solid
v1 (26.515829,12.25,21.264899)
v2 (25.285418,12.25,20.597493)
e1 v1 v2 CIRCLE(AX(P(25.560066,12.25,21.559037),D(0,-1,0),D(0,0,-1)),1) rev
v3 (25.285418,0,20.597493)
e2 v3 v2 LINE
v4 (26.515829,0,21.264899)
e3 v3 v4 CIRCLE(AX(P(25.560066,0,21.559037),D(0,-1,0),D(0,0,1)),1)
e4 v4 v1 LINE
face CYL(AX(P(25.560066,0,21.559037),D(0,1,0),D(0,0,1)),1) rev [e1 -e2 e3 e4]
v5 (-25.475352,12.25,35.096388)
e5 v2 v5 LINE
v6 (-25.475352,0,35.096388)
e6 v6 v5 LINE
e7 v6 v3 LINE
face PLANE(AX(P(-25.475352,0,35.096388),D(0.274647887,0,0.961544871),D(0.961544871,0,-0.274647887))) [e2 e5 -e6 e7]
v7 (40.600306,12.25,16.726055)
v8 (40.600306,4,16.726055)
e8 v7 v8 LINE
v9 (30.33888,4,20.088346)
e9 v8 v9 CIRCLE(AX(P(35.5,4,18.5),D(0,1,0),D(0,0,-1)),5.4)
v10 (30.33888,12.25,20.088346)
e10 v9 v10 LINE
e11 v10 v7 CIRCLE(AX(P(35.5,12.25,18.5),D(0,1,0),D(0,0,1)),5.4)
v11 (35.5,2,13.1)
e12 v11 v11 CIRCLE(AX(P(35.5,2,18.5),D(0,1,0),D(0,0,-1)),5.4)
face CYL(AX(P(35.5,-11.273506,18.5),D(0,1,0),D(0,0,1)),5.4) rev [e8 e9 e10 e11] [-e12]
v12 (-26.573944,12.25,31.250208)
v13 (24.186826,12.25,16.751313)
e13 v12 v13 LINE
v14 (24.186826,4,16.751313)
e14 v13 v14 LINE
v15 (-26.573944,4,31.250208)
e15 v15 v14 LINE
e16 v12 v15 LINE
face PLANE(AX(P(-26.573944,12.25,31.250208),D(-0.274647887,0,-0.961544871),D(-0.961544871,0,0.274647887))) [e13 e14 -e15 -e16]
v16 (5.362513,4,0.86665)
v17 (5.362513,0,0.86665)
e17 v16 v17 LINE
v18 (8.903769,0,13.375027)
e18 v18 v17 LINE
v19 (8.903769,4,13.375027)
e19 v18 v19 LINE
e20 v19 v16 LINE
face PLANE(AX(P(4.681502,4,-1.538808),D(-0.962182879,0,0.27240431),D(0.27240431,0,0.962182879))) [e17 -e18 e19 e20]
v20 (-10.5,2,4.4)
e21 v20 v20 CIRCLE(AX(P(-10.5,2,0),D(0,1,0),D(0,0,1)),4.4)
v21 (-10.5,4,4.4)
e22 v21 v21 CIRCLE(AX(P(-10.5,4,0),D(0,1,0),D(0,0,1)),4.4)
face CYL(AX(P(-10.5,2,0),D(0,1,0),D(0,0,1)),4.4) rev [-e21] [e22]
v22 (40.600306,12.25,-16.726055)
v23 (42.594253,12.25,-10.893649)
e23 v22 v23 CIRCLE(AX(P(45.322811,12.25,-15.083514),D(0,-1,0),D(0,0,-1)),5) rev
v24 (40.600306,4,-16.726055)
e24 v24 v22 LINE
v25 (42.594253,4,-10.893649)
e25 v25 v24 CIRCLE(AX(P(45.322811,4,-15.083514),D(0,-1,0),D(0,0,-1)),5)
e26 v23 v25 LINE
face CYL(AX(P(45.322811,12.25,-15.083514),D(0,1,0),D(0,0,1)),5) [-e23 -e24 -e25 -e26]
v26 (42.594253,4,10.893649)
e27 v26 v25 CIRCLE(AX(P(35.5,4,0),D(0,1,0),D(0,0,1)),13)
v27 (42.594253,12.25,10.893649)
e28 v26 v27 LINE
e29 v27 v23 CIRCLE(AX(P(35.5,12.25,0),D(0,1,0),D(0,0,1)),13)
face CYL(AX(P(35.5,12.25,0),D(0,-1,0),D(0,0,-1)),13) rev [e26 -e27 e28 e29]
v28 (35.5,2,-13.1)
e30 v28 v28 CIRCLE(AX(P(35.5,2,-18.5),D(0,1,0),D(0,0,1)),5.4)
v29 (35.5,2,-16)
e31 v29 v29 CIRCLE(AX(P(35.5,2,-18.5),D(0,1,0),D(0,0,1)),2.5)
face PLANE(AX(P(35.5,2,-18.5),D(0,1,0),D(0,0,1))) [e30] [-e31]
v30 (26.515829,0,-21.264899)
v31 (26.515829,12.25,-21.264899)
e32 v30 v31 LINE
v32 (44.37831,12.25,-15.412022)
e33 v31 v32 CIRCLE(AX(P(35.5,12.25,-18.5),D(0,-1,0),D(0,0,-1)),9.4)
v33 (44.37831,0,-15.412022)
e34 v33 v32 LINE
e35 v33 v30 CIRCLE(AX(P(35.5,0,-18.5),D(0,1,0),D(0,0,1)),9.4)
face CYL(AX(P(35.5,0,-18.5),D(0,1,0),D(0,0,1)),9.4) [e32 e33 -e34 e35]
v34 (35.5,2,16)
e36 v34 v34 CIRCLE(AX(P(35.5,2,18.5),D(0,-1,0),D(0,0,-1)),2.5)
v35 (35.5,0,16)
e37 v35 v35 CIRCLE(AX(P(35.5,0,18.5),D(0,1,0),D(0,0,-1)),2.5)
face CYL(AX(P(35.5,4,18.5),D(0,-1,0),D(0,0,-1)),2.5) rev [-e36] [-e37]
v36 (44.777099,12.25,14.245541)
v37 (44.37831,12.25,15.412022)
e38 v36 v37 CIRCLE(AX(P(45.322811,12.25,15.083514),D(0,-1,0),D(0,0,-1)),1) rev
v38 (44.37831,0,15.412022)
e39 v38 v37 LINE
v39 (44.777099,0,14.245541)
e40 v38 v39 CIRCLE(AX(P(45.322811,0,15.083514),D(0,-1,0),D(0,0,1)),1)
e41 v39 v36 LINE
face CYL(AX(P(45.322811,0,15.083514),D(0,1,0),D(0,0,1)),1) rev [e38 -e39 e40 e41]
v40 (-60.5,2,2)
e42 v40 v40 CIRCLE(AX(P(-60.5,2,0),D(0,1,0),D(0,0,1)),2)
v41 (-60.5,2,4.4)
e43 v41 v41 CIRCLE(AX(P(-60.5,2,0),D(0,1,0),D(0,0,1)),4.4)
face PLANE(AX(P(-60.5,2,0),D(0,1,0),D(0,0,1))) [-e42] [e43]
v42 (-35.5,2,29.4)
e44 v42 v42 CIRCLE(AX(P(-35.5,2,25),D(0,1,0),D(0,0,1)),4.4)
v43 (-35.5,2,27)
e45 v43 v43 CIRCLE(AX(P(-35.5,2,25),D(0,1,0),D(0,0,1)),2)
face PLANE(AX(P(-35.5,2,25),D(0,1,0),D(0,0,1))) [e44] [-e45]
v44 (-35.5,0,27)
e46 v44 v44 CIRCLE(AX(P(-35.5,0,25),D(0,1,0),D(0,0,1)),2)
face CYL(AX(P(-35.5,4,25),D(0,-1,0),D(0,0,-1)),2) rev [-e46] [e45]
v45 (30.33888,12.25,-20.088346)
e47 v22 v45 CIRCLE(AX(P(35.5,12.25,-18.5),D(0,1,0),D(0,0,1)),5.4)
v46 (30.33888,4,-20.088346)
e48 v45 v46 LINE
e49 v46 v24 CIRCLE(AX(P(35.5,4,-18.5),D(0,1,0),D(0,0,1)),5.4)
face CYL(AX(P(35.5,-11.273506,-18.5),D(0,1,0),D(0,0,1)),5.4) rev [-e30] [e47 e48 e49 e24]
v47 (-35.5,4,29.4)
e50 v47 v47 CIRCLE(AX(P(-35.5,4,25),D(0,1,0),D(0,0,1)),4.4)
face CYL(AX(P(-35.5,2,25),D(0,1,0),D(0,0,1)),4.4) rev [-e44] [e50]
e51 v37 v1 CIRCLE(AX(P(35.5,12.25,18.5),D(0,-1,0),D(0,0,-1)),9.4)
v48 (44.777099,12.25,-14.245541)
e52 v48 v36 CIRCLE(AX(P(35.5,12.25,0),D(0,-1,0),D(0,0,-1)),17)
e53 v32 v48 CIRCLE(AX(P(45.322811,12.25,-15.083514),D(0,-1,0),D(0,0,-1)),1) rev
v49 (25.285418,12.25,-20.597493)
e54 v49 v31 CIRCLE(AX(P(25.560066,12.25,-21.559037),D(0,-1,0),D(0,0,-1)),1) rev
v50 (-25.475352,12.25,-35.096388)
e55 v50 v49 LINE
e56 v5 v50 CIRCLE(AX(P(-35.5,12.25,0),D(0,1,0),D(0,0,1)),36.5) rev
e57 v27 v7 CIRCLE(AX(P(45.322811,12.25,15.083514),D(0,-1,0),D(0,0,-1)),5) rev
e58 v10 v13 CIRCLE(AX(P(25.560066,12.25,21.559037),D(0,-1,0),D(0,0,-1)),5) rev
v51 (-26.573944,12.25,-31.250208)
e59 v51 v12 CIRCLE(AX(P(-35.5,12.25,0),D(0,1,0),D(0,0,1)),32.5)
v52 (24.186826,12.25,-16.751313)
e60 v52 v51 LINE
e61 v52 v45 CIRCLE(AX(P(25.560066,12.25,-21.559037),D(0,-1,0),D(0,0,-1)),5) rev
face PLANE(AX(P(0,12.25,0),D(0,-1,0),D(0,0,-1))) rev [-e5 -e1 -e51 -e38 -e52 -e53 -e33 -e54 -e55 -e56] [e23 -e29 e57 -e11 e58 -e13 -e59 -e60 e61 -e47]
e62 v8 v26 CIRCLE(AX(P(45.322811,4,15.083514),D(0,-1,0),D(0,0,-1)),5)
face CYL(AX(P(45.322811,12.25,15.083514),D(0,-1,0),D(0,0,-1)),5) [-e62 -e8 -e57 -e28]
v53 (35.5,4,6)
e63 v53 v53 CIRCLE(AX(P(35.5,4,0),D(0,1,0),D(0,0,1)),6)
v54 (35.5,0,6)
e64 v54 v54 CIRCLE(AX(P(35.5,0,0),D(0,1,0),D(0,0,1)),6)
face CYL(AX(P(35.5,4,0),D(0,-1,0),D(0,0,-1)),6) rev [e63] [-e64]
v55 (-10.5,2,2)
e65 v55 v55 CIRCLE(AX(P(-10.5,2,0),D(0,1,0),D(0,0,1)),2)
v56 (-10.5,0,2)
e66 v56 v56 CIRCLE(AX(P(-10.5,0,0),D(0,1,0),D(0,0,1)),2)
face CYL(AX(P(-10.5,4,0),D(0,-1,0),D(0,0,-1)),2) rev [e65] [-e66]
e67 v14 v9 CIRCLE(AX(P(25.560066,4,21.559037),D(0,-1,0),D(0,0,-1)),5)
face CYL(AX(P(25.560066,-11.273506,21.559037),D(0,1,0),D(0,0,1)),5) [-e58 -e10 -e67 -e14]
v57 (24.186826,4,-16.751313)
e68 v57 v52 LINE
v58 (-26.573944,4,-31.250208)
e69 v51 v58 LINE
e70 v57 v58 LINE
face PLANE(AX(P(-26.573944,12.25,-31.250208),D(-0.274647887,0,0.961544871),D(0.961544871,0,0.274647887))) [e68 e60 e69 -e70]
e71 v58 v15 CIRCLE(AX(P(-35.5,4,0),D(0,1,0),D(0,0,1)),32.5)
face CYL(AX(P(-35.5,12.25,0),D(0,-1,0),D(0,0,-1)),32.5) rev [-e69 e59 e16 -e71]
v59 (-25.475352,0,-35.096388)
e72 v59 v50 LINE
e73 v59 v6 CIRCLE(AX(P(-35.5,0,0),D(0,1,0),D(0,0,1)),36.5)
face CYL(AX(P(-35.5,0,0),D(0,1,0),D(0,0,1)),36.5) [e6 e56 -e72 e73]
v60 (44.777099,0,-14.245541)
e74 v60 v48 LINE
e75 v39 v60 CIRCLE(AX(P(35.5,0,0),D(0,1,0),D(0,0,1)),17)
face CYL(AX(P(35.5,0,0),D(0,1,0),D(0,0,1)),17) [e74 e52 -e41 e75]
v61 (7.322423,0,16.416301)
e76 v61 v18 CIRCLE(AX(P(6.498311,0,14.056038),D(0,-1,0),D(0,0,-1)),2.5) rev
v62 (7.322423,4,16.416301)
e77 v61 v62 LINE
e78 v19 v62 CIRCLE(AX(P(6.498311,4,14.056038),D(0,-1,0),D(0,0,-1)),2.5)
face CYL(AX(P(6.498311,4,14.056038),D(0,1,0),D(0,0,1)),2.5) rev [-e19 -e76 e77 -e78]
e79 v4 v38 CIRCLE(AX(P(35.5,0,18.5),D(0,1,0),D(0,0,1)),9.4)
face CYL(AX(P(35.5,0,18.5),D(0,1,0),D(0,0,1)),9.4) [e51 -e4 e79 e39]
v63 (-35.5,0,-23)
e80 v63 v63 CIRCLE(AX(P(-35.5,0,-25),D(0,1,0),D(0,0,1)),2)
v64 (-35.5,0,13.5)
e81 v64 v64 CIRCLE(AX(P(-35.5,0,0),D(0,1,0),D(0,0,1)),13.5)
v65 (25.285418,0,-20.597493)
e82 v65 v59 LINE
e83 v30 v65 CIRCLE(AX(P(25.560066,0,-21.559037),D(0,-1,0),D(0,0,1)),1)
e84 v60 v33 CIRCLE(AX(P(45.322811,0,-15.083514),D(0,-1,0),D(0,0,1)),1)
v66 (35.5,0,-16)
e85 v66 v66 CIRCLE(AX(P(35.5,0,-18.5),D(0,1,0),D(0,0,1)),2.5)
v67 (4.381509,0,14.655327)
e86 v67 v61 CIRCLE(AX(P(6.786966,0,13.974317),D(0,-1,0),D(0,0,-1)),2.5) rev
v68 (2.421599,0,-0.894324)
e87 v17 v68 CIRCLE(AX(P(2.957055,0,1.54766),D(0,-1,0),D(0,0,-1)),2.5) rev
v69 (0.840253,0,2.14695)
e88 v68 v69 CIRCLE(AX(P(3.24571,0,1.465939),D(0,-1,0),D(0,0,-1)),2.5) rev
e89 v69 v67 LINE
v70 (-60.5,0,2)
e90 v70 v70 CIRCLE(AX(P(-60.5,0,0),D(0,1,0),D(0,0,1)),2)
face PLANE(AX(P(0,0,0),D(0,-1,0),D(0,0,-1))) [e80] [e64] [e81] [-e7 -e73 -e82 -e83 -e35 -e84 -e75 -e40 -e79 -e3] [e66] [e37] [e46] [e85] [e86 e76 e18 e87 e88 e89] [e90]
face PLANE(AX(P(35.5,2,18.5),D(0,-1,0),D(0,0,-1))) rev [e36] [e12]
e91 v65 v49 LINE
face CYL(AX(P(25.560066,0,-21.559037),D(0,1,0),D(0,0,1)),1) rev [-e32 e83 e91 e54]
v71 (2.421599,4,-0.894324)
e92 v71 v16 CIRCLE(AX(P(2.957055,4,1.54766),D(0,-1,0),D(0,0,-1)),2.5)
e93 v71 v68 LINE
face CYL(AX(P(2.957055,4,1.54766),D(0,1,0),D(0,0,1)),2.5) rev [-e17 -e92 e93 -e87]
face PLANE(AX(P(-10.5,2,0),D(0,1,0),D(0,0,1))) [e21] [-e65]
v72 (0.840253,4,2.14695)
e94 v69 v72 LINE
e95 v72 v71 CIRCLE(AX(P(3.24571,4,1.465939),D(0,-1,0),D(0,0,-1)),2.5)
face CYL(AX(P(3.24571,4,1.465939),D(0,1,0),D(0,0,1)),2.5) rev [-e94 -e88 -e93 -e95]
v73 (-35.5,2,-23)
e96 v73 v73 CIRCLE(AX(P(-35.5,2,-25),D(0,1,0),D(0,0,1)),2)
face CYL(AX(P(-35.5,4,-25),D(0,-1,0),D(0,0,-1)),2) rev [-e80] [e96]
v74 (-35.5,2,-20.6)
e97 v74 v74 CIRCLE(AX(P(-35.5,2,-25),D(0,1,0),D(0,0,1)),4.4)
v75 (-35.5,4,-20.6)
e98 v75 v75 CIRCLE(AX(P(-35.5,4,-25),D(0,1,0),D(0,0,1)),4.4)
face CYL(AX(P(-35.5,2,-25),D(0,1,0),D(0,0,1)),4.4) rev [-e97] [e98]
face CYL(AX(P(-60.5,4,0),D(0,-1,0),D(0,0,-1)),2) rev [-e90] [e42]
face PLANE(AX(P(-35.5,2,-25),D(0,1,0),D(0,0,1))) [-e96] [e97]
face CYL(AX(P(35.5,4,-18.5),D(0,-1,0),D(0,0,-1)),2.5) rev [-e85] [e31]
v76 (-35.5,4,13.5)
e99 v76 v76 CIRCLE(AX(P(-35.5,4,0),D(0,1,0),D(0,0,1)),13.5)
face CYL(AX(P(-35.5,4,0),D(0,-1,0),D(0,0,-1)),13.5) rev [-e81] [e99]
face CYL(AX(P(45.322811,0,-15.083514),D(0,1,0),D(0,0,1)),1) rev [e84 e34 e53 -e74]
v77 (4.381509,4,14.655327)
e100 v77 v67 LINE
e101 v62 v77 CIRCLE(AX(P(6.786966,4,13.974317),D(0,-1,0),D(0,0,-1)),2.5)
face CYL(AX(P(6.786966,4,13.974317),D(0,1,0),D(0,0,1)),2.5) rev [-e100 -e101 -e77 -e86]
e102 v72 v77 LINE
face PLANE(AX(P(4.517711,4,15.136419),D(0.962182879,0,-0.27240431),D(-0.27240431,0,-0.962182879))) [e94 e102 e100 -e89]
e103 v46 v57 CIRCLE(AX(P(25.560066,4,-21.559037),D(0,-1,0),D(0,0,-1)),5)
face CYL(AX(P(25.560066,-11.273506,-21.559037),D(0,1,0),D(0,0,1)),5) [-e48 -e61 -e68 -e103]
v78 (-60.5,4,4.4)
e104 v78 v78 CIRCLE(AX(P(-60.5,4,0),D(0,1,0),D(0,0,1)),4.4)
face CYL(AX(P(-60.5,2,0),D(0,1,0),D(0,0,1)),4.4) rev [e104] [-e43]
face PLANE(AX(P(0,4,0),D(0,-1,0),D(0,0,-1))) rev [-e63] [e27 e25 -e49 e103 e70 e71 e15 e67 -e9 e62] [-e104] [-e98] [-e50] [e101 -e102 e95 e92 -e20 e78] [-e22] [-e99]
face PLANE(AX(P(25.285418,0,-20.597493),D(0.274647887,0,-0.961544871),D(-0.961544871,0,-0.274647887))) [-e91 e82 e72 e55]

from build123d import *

# Parameters (mm, degrees)
SKETCH1_W               = 175
SKETCH1_H               = 100
SKETCH1_R               = 6
SKETCH1_R_2             = 13.5
SKETCH1_R_3             = 2
SKETCH1_R_4             = 2.5
BOSS_EXTRUDE1_DEPTH     = 4
SKETCH3_W               = 175
SKETCH3_H               = 100
BOSS_EXTRUDE2_DEPTH     = 8.25
SKETCH6_R               = 5.4
CUT_EXTRUDE2_DEPTH      = 8.25
FILLET1_R               = 2.5
FILLET2_R               = 5
SKETCH2_R               = 4.4
SKETCH2_R_2             = 5.4
CUT_EXTRUDE1_DEPTH      = 2
CUT_EXTRUDE4_DEPTH      = 102.520010478
CUT_EXTRUDE4_DEPTH_BACK = 102.520010478
SKETCH7_OUTSIDE_W       = 217.386
SKETCH7_OUTSIDE_H       = 142.386


with BuildPart() as part:
    # Sketch1 → Boss-Extrude1 (new body)
    with BuildSketch(Plane(origin=(0, 0, 0), x_dir=(1, 0, 0), z_dir=(0, 1, 0))):
        Rectangle(SKETCH1_W, SKETCH1_H)
        with Locations(Location((35.5, 0, 0), (0, 0, 270))):
            Circle(SKETCH1_R, mode=Mode.SUBTRACT)
        with Locations(Location((-35.5, 0, 0), (0, 0, 270))):
            Circle(SKETCH1_R_2, mode=Mode.SUBTRACT)
        with Locations(Location((-60.5, 0, 0), (0, 0, 270))):
            Circle(SKETCH1_R_3, mode=Mode.SUBTRACT)
        with Locations(Location((-35.5, 25, 0), (0, 0, 270))):
            Circle(SKETCH1_R_3, mode=Mode.SUBTRACT)
        with Locations(Location((-10.5, 0, 0), (0, 0, 270))):
            Circle(SKETCH1_R_3, mode=Mode.SUBTRACT)
        with Locations(Location((-35.5, -25, 0), (0, 0, 270))):
            Circle(SKETCH1_R_3, mode=Mode.SUBTRACT)
        with Locations(Location((35.5, 18.5, 0), (0, 0, 270))):
            Circle(SKETCH1_R_4, mode=Mode.SUBTRACT)
        with Locations(Location((35.5, -18.5, 0), (0, 0, 90))):
            Circle(SKETCH1_R_4, mode=Mode.SUBTRACT)
        Polygon((4.517711304, -15.136418767), (0.159242352, 0.258507293), (4.681501882, 1.538807548), (9.039970835, -13.856118512), (9.584779454, -15.78048427), (5.062519924, -17.060784524), align=None, mode=Mode.SUBTRACT)
    extrude(amount=BOSS_EXTRUDE1_DEPTH)

    # Sketch3 → Boss-Extrude2 (add)
    with BuildSketch(Plane(origin=(0, 4, 0), x_dir=(1, 0, 0), z_dir=(0, 1, 0))):
        Rectangle(SKETCH3_W, SKETCH3_H)
        with BuildLine():
            Line((-26.573943662, 31.250208291), (39.070422535, 12.500083317))
            ThreePointArc((39.070422535, 12.500083317), (48.5, 0), (39.070422535, -12.500083317))
            Line((39.070422535, -12.500083317), (-26.573943662, -31.250208291))
            ThreePointArc((-26.573943662, -31.250208291), (-68, 0), (-26.573943662, 31.250208291))
        make_face(mode=Mode.SUBTRACT)
    extrude(amount=BOSS_EXTRUDE2_DEPTH)

    # Sketch6 → Cut-Extrude2 (cut)
    with BuildSketch(Plane(origin=(0, 12.25, 0), x_dir=(1, 0, 0), z_dir=(0, 1, 0))):
        with Locations((35.5, 18.5)):
            Circle(SKETCH6_R)
        with Locations((35.5, -18.5)):
            Circle(SKETCH6_R)
    extrude(amount=-CUT_EXTRUDE2_DEPTH, mode=Mode.SUBTRACT)

    # Fillet1
    # the kernel refuses this fillet: 2.5 mm, written as the material it adds along each edge
    with BuildSketch(Plane(origin=(9.584779454, 0, 15.78048427), x_dir=(-0.9621828787440704, 0, 0.2724043095323078), z_dir=(0, 1, 0)), Plane(origin=(5.062519924, 0, 17.060784524), x_dir=(-0.2724043095323173, 0, -0.9621828787440677), z_dir=(0, 1, 0)), Plane(origin=(4.681501882, 0, -1.538807548), x_dir=(0.2724043095323092, 0, 0.96218287874407), z_dir=(0, 1, 0))) as fillet1_piece_1:
        with BuildLine():
            CenterArc((FILLET1_R, -FILLET1_R), FILLET1_R, 90, 90)
            Line((0, -FILLET1_R), (0, 0))
            Line((0, 0), (FILLET1_R, 0))
        make_face()
    extrude(amount=4)
    with BuildSketch(Plane(origin=(0.159242352, 0, -0.258507293), x_dir=(0.2724043095323079, 0, 0.9621828787440704), z_dir=(0, 1, 0))) as fillet1_piece_2:
        with BuildLine():
            CenterArc((FILLET1_R, FILLET1_R), FILLET1_R, 180, 90)
            Line((0, FILLET1_R), (0, 0))
            Line((0, 0), (FILLET1_R, 0))
        make_face()
    extrude(amount=4)

    # Fillet2
    fillet2_edges = [part.edges().sort_by_distance(p)[0] for p in [
        (31.784909874, 8.125, 14.581058133),
        (36.584743308, 8.125, 13.210072594),
        (36.584743308, 8.125, -13.210072594),
        (31.784909874, 8.125, -14.581058133),
    ]]
    fillet(fillet2_edges, radius=FILLET2_R)

    # Sketch2 → Cut-Extrude1 (cut)
    with BuildSketch(Plane(origin=(0, 4, 0), x_dir=(1, 0, 0), z_dir=(0, 1, 0))):
        with Locations(Location((-35.5, 25, 0), (0, 0, 270))):
            Circle(SKETCH2_R)
        with Locations(Location((-10.5, 0, 0), (0, 0, 270))):
            Circle(SKETCH2_R)
        with Locations(Location((-35.5, -25, 0), (0, 0, 270))):
            Circle(SKETCH2_R)
        with Locations(Location((-60.5, 0, 0), (0, 0, 270))):
            Circle(SKETCH2_R)
        with Locations(Location((35.5, 18.5, 0), (0, 0, 270))):
            Circle(SKETCH2_R_2)
        with Locations(Location((35.5, -18.5, 0), (0, 0, 197.105868404))):
            Circle(SKETCH2_R_2)
    extrude(amount=-CUT_EXTRUDE1_DEPTH, mode=Mode.SUBTRACT)

    # Sketch7 outside → Cut-Extrude4 (cut, two sides: drawn at the far end of the back side and taken through both)
    with BuildSketch(Plane(origin=(0, 12.25, 0), x_dir=(1, 0, 0), z_dir=(0, 1, 0)).offset(-CUT_EXTRUDE4_DEPTH_BACK)):
        Rectangle(SKETCH7_OUTSIDE_W, SKETCH7_OUTSIDE_H)
        with BuildLine():
            Line((-25.475352113, -35.096387773), (25.285418022, -20.597492606))
            ThreePointArc((25.285418022, -20.597492606), (26.036864948, -20.680025145), (26.515828803, -21.264899257))
            ThreePointArc((26.515828803, -21.264899257), (38.426917352, -27.432701429), (44.378310133, -15.41202183))
            ThreePointArc((44.378310133, -15.41202183), (44.376580158, -14.760021946), (44.777099477, -14.245540541))
            ThreePointArc((44.777099477, -14.245540541), (52.5, 0), (44.777099477, 14.245540541))
            ThreePointArc((44.777099477, 14.245540541), (44.376580158, 14.760021946), (44.378310133, 15.41202183))
            ThreePointArc((44.378310133, 15.41202183), (38.426917352, 27.432701429), (26.515828803, 21.264899257))
            ThreePointArc((26.515828803, 21.264899257), (26.036864948, 20.680025145), (25.285418022, 20.597492606))
            Line((25.285418022, 20.597492606), (-25.475352113, 35.096387773))
            ThreePointArc((-25.475352113, 35.096387773), (-72, 0), (-25.475352113, -35.096387773))
        make_face(mode=Mode.SUBTRACT)
    extrude(amount=CUT_EXTRUDE4_DEPTH + CUT_EXTRUDE4_DEPTH_BACK, mode=Mode.SUBTRACT)


solid = part.part
